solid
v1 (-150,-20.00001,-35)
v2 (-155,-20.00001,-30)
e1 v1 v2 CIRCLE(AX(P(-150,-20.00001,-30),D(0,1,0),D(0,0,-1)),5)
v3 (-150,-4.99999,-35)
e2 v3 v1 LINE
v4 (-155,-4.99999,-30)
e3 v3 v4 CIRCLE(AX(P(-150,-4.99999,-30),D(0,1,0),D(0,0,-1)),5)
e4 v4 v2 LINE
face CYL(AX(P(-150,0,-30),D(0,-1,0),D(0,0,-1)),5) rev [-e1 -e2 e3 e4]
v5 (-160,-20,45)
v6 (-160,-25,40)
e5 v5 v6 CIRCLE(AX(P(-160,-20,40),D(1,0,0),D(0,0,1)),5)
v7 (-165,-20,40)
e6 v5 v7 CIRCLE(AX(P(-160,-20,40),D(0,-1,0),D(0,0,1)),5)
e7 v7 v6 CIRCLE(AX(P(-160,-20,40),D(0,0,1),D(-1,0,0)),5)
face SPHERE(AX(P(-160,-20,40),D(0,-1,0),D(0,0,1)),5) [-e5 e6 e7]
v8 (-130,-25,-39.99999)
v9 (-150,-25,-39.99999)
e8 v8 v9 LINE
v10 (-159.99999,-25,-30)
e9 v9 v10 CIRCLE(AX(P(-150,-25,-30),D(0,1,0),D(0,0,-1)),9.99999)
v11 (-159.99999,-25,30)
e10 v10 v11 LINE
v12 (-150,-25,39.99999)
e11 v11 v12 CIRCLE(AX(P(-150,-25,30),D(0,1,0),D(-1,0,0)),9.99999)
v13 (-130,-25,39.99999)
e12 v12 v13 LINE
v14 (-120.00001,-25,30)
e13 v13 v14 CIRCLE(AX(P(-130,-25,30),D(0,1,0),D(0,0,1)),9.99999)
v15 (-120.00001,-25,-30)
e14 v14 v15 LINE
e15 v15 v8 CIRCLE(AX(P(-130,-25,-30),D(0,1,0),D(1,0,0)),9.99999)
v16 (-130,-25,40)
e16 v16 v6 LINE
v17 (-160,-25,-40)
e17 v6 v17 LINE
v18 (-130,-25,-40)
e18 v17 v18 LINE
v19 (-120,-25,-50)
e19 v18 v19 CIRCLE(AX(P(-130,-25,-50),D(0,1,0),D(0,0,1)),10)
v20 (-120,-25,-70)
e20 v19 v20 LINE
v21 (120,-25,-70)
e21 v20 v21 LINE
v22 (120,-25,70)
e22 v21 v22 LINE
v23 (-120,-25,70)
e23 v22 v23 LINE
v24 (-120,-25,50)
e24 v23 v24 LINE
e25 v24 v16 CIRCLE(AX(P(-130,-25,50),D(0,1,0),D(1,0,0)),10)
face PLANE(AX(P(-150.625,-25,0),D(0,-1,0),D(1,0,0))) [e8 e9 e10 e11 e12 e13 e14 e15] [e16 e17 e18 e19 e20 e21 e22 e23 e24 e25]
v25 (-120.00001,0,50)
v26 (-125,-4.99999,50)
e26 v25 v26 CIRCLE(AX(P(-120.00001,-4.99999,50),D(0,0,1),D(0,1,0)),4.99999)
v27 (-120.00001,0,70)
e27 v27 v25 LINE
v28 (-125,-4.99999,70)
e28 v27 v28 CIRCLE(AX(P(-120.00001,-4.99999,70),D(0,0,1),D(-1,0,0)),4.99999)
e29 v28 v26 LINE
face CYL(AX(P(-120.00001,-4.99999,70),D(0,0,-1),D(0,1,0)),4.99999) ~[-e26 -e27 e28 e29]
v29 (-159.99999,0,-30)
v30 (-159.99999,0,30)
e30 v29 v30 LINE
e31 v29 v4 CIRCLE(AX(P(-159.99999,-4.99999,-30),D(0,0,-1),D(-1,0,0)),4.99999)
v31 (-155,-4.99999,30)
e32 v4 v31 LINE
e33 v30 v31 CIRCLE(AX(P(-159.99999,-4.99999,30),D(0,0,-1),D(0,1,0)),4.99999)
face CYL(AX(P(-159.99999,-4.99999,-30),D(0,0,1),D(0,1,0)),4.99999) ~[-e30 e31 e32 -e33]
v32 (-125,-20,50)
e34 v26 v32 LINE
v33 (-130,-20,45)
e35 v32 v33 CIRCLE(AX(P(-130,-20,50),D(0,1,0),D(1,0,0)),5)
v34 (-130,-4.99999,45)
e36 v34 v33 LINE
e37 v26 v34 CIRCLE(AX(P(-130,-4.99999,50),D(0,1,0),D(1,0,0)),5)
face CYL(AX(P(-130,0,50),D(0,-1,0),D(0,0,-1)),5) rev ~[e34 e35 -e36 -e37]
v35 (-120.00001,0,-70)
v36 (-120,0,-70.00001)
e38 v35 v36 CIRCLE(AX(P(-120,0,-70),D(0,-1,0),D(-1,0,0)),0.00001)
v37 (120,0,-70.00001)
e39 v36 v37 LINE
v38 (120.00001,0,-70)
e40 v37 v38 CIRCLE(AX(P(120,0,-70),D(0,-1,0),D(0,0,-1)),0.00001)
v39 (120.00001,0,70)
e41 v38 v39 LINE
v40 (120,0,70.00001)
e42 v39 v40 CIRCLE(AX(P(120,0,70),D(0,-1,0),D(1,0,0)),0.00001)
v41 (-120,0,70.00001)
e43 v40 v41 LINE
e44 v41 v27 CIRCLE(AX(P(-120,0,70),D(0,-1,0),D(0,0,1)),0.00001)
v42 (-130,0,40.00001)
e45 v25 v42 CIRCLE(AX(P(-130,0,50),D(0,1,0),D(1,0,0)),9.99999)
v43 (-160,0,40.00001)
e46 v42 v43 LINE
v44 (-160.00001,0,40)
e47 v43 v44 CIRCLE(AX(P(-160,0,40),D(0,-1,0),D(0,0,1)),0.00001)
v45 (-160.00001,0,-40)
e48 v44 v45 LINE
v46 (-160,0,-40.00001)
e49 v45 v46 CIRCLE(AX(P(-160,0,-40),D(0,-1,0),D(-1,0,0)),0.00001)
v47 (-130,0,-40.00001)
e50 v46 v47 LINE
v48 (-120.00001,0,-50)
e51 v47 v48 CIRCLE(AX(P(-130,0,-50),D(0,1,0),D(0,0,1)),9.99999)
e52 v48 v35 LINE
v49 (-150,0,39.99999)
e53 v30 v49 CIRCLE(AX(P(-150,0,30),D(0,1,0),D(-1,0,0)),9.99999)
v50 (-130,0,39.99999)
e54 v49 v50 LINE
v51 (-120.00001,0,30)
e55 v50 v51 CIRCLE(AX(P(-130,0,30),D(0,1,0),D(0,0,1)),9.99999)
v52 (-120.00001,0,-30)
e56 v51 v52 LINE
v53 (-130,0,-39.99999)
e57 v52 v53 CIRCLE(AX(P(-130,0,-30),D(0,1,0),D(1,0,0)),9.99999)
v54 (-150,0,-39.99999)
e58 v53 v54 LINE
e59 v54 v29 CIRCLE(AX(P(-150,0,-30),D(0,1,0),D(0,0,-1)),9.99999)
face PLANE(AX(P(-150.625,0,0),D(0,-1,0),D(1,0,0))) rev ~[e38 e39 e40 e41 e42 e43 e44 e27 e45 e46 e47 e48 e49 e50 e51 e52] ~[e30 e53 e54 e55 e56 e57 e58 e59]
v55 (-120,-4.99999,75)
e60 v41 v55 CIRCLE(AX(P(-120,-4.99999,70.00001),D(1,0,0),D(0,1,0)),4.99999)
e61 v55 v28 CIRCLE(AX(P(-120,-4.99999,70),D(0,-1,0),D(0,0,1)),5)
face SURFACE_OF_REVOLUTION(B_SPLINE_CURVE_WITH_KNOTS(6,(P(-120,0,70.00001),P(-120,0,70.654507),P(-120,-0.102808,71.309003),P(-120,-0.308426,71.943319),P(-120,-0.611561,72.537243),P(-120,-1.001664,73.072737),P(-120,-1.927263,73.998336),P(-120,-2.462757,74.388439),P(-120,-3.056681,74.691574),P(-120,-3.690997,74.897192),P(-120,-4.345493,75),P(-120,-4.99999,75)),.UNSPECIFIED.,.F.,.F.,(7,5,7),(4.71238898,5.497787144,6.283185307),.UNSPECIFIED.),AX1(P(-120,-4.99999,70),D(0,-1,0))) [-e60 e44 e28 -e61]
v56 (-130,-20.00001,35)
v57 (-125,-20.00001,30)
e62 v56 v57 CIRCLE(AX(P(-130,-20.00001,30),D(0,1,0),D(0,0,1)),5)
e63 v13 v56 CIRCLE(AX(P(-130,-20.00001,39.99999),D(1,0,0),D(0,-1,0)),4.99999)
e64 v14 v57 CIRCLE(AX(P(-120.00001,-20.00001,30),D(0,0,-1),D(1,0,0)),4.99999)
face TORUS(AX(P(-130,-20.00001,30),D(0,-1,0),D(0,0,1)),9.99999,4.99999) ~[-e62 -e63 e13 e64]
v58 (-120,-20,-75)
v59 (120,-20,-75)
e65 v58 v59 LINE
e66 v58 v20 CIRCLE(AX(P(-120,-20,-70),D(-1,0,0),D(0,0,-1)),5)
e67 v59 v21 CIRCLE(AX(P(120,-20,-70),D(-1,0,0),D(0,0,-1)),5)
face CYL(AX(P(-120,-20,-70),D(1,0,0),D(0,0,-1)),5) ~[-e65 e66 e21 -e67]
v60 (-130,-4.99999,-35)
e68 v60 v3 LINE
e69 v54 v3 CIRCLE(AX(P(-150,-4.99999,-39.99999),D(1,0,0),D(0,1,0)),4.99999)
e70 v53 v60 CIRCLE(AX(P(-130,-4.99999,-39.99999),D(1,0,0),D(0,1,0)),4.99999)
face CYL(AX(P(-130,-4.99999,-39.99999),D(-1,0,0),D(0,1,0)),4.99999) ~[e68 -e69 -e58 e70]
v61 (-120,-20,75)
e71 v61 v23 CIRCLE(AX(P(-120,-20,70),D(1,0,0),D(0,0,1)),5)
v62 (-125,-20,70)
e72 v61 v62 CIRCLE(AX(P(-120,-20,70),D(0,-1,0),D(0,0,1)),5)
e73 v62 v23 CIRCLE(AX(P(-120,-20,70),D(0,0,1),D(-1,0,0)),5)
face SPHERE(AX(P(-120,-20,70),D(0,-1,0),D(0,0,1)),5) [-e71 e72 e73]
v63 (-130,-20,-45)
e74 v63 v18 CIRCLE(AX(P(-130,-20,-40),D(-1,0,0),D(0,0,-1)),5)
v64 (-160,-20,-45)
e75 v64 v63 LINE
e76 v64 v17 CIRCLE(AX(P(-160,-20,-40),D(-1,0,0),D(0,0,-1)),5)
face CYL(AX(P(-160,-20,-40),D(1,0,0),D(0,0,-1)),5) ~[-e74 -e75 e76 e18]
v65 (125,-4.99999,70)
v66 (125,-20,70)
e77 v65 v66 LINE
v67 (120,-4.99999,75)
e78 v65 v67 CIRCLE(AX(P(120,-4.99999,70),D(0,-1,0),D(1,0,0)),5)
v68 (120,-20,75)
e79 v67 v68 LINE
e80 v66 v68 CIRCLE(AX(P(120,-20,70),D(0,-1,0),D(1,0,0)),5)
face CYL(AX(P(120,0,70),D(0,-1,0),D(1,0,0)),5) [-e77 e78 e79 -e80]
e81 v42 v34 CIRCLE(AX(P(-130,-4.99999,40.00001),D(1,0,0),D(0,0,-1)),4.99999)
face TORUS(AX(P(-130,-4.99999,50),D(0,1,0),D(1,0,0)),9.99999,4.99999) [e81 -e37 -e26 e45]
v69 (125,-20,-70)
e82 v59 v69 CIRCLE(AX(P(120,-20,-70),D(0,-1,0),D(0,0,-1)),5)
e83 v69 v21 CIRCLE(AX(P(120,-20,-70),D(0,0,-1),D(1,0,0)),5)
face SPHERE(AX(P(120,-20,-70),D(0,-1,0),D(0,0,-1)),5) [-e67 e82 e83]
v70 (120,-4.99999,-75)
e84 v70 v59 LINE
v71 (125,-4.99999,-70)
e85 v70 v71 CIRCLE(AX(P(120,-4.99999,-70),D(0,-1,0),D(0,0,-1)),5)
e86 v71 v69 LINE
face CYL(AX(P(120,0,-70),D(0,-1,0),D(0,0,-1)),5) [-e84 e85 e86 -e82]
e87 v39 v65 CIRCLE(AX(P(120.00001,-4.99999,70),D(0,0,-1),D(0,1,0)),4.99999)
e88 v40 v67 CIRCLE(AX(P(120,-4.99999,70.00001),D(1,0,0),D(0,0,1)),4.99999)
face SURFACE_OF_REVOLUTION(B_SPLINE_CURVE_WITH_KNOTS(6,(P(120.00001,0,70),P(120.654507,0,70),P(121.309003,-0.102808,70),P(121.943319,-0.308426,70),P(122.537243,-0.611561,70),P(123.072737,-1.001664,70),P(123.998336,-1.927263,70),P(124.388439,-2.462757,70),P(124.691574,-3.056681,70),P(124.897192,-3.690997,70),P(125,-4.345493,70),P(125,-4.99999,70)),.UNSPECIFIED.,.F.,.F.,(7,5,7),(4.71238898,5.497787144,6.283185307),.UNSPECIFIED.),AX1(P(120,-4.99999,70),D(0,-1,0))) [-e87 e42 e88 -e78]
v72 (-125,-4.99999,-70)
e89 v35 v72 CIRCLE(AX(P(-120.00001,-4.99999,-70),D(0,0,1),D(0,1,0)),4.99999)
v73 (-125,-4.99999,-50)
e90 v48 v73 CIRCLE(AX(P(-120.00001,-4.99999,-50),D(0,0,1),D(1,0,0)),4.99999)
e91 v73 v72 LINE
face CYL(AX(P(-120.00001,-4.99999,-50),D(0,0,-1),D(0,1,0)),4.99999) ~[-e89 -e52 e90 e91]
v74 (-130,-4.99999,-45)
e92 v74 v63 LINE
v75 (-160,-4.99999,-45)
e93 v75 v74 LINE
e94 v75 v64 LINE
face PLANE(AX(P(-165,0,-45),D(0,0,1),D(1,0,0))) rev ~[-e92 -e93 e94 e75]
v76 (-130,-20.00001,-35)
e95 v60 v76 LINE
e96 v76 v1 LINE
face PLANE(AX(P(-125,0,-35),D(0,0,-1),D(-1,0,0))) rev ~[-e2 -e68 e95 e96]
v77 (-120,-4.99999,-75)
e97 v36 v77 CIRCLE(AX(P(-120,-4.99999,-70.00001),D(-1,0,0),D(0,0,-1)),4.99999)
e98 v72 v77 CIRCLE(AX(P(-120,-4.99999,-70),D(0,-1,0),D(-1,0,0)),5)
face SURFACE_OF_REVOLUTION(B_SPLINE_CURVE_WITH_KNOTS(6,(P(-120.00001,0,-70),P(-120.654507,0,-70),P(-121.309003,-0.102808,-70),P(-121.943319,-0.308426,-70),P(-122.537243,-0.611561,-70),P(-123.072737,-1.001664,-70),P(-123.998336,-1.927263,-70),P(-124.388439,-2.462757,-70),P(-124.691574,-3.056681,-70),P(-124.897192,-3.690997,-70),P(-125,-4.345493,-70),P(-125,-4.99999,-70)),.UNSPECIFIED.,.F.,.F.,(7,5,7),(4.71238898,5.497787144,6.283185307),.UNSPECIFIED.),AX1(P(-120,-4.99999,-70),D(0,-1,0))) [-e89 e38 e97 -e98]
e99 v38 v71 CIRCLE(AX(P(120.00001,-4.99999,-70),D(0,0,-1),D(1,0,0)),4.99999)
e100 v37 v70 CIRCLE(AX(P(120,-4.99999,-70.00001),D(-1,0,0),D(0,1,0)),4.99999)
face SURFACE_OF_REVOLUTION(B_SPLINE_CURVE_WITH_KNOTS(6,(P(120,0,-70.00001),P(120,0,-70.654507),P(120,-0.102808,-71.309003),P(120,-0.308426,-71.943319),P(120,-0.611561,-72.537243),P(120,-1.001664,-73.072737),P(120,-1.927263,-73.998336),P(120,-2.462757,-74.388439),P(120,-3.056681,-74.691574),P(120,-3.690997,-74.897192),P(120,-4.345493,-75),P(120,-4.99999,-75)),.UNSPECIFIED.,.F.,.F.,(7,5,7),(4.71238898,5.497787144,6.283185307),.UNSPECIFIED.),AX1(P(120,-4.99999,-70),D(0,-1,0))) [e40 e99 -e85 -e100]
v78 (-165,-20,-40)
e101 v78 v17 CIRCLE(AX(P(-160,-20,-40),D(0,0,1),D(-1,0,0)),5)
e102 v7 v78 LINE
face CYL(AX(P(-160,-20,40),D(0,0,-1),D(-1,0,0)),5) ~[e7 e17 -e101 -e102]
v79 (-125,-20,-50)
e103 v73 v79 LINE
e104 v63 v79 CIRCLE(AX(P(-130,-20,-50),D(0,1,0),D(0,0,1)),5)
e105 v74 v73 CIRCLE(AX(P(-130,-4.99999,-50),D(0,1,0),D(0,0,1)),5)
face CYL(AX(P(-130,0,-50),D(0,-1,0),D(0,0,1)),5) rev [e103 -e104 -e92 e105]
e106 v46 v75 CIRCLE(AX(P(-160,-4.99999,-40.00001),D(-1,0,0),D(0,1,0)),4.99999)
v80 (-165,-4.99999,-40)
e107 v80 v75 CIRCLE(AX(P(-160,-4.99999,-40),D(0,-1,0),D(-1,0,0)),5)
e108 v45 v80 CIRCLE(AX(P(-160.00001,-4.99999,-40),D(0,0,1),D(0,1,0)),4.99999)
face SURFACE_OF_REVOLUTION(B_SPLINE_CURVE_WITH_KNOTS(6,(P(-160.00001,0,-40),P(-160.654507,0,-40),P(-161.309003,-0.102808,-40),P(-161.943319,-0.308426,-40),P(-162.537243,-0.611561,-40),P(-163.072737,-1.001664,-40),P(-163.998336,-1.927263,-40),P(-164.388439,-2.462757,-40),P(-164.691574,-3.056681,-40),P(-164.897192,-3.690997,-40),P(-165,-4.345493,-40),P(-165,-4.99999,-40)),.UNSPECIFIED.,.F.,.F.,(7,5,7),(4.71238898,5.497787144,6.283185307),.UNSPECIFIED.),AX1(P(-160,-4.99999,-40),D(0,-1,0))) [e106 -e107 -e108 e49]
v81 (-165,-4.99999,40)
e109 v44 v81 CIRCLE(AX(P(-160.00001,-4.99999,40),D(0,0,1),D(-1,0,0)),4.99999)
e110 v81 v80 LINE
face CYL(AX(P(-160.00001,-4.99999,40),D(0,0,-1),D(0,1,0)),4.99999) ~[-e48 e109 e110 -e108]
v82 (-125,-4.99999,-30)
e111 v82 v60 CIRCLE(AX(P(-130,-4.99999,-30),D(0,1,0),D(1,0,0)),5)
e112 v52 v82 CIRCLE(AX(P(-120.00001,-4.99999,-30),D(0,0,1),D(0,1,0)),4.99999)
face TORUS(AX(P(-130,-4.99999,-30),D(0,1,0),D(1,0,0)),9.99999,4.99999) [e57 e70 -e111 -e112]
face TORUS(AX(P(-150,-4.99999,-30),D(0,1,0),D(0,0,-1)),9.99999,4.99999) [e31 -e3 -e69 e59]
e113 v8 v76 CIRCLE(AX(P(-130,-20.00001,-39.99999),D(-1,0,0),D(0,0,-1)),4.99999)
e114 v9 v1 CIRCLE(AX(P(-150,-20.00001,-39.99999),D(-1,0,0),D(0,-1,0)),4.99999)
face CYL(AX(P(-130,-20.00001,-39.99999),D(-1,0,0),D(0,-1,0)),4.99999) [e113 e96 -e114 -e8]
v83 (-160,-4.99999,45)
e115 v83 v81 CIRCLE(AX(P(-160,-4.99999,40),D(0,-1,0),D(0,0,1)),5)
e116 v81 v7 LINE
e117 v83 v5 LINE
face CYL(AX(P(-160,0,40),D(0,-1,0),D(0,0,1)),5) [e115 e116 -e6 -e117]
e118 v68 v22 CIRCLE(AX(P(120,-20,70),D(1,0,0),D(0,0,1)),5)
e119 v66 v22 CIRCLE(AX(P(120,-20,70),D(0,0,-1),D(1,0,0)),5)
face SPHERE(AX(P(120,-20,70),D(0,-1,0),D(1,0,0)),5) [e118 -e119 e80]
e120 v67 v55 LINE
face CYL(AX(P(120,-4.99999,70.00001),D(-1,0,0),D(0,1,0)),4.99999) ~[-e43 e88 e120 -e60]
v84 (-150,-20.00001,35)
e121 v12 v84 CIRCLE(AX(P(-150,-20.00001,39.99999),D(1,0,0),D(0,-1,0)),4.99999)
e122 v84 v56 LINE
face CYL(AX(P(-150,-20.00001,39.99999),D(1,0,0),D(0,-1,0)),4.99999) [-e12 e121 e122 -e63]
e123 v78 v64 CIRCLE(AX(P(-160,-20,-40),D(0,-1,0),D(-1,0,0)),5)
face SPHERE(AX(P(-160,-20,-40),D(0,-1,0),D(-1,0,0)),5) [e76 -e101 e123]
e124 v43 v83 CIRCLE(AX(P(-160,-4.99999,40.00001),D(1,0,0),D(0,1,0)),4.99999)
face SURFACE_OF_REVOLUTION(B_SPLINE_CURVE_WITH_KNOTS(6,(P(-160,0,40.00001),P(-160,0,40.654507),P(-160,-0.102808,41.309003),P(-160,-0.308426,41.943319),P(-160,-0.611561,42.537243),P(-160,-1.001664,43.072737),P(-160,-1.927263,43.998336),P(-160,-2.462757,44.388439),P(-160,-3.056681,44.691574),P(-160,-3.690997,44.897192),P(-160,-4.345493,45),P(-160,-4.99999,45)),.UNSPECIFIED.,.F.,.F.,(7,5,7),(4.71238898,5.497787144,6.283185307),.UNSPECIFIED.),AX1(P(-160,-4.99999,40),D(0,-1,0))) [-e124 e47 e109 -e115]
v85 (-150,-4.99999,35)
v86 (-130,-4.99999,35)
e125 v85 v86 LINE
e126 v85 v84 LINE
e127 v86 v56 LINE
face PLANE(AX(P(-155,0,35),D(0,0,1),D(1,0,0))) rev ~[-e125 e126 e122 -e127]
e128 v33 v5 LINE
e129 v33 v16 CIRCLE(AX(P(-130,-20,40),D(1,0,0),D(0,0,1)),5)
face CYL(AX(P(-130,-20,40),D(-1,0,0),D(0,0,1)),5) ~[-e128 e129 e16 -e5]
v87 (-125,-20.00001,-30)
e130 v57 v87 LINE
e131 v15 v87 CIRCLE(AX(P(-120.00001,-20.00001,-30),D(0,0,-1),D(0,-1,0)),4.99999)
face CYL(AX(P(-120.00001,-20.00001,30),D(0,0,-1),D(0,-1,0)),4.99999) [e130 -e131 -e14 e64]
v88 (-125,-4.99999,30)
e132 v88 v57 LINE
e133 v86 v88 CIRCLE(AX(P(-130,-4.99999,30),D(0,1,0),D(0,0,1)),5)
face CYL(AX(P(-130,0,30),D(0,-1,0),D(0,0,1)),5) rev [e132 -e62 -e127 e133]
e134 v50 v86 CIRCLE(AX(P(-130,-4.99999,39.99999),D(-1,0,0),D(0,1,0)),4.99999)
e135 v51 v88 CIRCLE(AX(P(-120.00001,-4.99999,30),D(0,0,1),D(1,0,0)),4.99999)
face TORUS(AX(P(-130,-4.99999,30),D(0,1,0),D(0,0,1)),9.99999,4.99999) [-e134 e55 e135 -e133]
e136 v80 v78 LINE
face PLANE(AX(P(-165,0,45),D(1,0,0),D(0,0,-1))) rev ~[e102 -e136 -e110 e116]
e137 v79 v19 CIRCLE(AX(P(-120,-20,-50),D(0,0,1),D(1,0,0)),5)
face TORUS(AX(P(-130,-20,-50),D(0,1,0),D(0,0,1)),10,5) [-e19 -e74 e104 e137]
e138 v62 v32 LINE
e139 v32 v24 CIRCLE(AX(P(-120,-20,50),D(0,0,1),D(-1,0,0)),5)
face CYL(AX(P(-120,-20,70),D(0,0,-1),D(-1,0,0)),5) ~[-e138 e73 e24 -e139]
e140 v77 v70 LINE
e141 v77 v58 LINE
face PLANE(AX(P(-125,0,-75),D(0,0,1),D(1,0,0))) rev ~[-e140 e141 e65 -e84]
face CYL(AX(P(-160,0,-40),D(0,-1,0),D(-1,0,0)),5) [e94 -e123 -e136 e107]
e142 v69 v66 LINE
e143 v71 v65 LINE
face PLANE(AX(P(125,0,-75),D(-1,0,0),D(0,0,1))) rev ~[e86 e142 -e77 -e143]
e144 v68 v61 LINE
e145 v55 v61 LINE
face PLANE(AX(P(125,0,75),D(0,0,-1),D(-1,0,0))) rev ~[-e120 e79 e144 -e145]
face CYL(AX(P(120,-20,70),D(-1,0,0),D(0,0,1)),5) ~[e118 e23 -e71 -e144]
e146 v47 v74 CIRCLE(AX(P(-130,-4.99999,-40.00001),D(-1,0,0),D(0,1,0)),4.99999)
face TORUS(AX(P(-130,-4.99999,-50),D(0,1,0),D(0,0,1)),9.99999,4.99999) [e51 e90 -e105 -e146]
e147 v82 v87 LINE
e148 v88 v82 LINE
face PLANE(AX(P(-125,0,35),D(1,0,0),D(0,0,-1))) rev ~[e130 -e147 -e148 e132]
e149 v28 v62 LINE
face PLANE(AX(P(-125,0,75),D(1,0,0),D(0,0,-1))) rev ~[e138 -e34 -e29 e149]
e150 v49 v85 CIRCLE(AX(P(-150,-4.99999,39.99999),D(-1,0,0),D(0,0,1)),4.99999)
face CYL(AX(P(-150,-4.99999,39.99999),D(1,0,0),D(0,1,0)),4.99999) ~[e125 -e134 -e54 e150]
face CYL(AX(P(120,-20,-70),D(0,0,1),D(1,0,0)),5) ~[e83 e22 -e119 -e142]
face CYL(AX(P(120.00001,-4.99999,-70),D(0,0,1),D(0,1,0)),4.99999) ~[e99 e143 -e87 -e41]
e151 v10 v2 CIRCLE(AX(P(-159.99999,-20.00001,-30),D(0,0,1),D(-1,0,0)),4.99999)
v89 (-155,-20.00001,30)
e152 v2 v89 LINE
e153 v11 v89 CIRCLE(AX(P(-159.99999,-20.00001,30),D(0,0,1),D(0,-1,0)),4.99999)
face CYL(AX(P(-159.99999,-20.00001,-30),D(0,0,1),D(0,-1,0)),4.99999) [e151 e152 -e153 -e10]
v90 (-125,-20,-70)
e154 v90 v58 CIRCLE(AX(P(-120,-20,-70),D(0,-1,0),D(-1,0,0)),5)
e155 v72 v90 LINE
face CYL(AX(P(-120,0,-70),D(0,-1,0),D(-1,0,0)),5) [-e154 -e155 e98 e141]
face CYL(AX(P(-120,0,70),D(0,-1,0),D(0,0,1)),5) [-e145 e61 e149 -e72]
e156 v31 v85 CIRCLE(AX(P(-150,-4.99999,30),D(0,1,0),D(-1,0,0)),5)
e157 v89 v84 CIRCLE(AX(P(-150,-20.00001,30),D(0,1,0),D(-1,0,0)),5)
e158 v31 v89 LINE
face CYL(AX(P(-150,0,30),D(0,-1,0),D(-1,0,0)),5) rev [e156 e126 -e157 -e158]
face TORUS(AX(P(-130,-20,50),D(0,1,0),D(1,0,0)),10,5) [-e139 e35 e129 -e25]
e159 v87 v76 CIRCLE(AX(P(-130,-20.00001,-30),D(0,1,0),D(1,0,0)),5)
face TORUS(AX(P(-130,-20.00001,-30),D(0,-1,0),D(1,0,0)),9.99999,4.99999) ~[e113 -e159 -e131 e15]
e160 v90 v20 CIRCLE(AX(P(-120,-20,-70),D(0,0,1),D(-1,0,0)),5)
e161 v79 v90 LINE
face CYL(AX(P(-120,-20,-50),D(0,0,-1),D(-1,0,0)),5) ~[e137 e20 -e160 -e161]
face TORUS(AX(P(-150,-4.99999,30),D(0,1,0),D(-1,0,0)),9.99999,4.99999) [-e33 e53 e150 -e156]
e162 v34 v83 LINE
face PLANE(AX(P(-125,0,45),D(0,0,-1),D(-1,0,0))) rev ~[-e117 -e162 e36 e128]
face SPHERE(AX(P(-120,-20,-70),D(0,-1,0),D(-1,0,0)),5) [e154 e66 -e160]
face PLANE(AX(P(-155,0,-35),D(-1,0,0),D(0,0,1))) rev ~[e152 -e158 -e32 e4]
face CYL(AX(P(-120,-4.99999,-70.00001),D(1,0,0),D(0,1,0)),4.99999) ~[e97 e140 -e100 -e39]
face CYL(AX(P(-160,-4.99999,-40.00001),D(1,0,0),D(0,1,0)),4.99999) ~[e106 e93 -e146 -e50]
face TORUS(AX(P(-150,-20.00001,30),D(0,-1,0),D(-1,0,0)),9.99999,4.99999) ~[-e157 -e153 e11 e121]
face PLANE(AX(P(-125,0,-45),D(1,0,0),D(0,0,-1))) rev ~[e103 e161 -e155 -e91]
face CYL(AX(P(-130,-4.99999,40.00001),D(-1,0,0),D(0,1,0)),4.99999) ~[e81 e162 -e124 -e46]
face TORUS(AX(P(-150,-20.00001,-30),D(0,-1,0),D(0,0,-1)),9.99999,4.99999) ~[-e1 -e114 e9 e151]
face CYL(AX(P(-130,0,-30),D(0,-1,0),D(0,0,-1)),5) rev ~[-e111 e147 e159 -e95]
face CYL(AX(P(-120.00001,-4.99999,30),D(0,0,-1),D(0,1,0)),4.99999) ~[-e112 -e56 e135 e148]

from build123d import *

# Parameters (mm, degrees)
F1_DEPTH = 25
F2_R     = 5
F3_R     = 5
F4_R     = 4.99999


# Not quite as in the source:
# - a fillet or chamfer is up to 0.001 mm smaller than in the source, because OpenCascade refuses the exact size


with BuildPart() as f1:
    # F0 (on Front) → F1 (new body)
    with BuildSketch(Plane.XZ):
        Polygon((-125, 35), (-125, 45), (-165, 45), (-165, -45), (-125, -45), (-125, -35), (-155, -35), (-155, 35), align=None)
        Polygon((125, -75), (125, 75), (-125, 75), (-125, 45), (-125, 35), (-125, -35), (-125, -45), (-125, -75), align=None)
    extrude(amount=F1_DEPTH)

    # F2
    f2_edges = [f1.edges().sort_by_distance(p)[0] for p in [
        (-125, -12.5, 45),
        (-165, -12.5, 45),
        (-165, -12.5, -45),
        (-125, -12.5, -45),
        (-125, -12.5, -35),
        (-155, -12.5, -35),
        (-155, -12.5, 35),
        (-125, -12.5, 35),
        (-125, -12.5, 75),
        (-125, -12.5, -75),
        (125, -12.5, -75),
        (125, -12.5, 75),
    ]]
    fillet(f2_edges, radius=F2_R)

    # F3
    f3_edges = [f1.edges().sort_by_distance(p)[0] for p in [
        (-145, -25, 45),
    ]]
    fillet(f3_edges, radius=F3_R)

    # F4 (radius 5 in the source; OpenCascade refuses exactly that, so slightly less here)
    f4_edges = [f1.edges().sort_by_distance(p)[0] for p in [
        (-140, -25, 35),
        (-145, 0, -45),
        (-140, 0, -35),
    ]]
    fillet(f4_edges, radius=F4_R)


solid = f1.part
